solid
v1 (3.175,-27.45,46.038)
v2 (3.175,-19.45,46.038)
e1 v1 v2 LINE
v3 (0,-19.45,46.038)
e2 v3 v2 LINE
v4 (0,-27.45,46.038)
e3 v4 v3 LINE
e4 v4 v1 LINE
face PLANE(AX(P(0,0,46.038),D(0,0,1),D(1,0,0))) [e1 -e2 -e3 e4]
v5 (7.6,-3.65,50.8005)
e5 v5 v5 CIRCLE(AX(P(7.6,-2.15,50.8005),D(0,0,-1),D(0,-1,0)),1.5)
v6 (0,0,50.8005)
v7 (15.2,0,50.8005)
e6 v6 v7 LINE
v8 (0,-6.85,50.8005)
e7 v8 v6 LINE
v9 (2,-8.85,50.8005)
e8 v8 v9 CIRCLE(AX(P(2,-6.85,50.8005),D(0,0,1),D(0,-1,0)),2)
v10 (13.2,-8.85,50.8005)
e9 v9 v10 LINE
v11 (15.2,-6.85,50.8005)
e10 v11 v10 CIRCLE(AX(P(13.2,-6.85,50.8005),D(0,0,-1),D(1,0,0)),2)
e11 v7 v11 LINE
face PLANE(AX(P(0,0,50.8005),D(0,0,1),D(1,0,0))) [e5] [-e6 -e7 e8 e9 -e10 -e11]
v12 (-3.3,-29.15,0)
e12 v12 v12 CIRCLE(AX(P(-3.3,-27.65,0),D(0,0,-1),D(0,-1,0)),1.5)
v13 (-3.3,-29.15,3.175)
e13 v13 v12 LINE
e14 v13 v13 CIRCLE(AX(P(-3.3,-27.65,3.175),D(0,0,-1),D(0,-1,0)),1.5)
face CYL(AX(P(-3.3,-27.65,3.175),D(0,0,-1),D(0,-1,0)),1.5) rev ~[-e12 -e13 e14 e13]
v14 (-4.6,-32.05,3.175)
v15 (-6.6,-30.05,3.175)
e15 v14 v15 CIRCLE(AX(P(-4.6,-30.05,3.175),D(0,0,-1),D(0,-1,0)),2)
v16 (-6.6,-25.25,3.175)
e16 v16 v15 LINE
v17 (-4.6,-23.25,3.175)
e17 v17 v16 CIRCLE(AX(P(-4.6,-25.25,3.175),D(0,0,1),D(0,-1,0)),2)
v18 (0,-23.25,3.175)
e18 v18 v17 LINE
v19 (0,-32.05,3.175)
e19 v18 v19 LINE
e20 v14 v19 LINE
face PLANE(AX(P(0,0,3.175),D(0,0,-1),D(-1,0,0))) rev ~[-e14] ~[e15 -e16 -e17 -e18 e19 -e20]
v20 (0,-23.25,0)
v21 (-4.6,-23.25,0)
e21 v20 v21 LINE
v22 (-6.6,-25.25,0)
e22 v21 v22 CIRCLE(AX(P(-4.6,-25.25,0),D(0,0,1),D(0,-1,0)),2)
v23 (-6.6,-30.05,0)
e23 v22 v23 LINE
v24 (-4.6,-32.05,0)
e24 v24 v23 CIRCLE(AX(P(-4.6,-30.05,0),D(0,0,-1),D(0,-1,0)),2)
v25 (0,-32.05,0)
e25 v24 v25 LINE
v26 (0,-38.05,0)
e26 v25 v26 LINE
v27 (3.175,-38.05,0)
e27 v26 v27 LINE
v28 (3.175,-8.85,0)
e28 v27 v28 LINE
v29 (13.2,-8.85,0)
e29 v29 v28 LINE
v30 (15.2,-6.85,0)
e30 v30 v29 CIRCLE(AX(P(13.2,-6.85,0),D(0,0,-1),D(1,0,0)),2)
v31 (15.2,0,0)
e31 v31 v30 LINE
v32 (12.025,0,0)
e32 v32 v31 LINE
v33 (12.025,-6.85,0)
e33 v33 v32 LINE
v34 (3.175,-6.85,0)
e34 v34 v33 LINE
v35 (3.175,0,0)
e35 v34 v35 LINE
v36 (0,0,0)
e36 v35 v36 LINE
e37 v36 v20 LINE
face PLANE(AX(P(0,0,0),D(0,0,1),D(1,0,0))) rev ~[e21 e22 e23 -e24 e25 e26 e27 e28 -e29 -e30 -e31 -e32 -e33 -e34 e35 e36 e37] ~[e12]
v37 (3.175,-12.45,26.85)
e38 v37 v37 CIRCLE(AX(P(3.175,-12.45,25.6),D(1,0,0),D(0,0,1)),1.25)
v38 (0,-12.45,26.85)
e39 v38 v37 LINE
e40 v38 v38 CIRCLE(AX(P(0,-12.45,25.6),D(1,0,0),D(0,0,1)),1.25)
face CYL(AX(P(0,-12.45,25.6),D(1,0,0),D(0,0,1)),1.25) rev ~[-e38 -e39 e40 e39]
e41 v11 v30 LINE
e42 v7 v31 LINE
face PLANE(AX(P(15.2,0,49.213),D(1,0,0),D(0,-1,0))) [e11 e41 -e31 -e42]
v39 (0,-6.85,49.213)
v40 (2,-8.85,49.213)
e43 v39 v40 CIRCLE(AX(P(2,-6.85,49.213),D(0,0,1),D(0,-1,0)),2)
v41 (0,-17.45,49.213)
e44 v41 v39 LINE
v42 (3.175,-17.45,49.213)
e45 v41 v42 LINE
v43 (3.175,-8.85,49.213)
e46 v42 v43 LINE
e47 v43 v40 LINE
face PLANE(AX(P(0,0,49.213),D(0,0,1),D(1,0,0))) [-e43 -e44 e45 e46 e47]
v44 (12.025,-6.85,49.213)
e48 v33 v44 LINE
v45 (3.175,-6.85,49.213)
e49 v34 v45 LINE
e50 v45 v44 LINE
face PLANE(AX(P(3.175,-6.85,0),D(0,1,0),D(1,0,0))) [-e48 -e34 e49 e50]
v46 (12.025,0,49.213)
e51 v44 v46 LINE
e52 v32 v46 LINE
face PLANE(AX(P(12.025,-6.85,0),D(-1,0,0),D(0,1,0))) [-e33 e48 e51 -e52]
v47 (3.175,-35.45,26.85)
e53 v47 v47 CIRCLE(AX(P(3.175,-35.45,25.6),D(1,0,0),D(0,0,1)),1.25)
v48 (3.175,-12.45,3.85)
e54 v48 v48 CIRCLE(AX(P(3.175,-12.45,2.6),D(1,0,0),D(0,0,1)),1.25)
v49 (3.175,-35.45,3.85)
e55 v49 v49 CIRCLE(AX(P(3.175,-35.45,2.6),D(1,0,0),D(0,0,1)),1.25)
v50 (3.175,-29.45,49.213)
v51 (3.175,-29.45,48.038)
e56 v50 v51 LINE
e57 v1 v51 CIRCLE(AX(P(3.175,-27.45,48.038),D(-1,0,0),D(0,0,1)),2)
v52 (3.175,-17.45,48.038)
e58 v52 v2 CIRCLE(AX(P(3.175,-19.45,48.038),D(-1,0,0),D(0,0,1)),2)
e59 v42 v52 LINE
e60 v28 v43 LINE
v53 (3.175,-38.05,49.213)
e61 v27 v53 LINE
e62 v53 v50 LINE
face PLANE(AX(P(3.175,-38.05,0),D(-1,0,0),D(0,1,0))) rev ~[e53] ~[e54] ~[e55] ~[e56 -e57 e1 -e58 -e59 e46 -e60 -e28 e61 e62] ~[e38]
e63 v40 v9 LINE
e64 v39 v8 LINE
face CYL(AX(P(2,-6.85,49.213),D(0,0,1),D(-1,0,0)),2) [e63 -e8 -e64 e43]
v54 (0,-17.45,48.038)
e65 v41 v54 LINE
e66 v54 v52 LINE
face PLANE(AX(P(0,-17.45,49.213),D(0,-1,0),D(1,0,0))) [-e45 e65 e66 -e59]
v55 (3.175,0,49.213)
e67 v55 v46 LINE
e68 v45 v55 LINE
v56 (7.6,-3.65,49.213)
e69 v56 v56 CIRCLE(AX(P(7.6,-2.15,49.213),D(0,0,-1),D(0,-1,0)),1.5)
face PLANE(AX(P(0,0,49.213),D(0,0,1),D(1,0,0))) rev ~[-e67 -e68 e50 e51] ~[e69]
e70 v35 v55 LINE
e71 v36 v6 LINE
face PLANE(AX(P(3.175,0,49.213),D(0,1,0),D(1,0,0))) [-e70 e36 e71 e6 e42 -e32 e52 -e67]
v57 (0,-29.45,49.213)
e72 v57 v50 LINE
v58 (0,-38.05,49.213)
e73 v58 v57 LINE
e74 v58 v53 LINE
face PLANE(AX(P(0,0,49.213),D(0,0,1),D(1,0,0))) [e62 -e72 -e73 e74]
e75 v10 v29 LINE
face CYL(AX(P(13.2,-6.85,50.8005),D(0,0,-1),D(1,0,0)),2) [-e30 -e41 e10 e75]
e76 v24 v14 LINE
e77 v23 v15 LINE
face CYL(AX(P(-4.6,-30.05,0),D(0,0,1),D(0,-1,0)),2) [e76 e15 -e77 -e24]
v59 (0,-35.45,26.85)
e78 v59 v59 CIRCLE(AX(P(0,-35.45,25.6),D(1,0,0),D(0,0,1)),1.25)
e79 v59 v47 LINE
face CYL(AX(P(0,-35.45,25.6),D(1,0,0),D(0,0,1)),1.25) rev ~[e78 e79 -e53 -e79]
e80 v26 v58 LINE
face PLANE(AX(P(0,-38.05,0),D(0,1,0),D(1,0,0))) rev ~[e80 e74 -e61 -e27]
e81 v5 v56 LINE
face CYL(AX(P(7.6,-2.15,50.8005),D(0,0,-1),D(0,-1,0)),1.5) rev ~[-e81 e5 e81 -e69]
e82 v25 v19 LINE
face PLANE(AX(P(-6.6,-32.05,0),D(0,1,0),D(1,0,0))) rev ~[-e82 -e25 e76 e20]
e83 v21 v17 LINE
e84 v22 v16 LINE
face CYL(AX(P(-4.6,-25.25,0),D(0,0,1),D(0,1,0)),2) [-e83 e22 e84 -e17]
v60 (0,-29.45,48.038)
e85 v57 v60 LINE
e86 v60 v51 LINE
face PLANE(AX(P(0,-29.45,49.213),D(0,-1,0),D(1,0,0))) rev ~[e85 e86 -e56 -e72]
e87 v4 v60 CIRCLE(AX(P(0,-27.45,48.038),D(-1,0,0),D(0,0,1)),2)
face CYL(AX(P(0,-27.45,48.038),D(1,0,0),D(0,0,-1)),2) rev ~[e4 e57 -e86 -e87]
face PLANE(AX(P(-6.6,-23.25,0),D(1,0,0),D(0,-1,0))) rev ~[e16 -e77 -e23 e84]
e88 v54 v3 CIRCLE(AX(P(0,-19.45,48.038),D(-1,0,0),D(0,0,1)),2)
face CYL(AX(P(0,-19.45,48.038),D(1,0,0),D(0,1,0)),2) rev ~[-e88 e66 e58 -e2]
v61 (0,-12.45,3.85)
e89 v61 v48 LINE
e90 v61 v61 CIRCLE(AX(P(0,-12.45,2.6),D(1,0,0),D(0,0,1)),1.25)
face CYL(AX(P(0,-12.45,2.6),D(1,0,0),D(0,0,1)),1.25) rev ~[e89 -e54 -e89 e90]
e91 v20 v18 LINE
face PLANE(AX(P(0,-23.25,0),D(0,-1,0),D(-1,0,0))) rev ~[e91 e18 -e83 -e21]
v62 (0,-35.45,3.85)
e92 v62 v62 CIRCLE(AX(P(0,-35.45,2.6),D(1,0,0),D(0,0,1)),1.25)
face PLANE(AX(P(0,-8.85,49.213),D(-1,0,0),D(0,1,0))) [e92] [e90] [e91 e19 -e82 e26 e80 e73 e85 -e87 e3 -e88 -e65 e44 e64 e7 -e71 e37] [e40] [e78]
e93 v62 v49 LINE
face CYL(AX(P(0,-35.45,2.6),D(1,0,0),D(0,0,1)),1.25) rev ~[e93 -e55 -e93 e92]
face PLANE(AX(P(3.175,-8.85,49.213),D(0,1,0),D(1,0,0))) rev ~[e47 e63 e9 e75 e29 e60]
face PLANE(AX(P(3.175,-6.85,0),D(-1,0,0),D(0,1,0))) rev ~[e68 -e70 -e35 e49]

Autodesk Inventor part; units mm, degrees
ref_plane "YZ Plane" through (0, 0, 0) normal (1, 0, 0) x (0, 1, 0)
ref_plane "XZ Plane" through (0, 0, 0) normal (0, 1, 0) x (-1, 0, 0)
ref_plane "XY Plane" through (0, 0, 0) normal (0, 0, 1) x (1, 0, 0)
sketch "Sketch1" plane through (0, 0, 0) normal (0, 0, 1) x (1, 0, 0)
  line L0 (0, 0) -> (0, -38.05)
  line L1 (0, -38.05) -> (3.175, -38.05)
  line L2 (3.175, -38.05) -> (3.175, 0)
  line L3 (3.175, 0) -> (0, 0)
  line L4 (3.175, 0) -> (3.175, -6.85)
  line L5 (3.175, -6.85) -> (12.025, -6.85)
  line L6 (12.025, -6.85) -> (12.025, 0)
  line L7 (12.025, 0) -> (15.2, 0)
  line L8 (15.2, 0) -> (15.2, -6.85)
  line L9 (15.2, -6.85) -> (15.2, -8.85)
  line L10 (15.2, -8.85) -> (3.175, -8.85)
  line L11 (0, -38.05) -> (0, -31.2)
  dimension "d0" = 38.05
  dimension "d1" = 3.175
  dimension "d2" = 6.85
  dimension "d3" = 8.85
  dimension "d4" = 3.175
  dimension "d5" = 2
extrude "Extrusion1" add sketch "Sketch1" along normal blind 49.213
sketch "Sketch2" plane through (0, 0, 0) normal (0, 0, -1) x (-1, 0, 0)
  line L0 (0, -38.05) -> (-3.175, -38.05) projected
  line L1 (0, -38.05) -> (0, -32.05)
  line L2 (0, 0) -> (0, -38.05) projected
  line L3 (0, -32.05) -> (0, -23.25)
  line L4 (0, -23.25) -> (6.6, -23.25)
  line L5 (6.6, -23.25) -> (6.6, -32.05)
  line L6 (6.6, -32.05) -> (0, -32.05)
  dimension "d12" = 6
  dimension "d13" = 8.8
  dimension "d14" = 6.6
extrude "Extrusion2" add sketch "Sketch2" against normal blind 3.175
sketch "Sketch3" plane through (0, 0, 3.175) normal (0, 0, 1) x (1, 0, 0)
  line L0 (0, -23.25) -> (0, -32.05) projected
  line L1 (0, -23.25) -> (-3.3, -23.25)
  line L2 (0, -23.25) -> (-6.6, -23.25) projected
  line L3 (-3.3, -23.25) -> (-3.3, -27.65)
  point P0 (0, 0)
  dimension "d17" = 4.4
hole "Hole1" at (-3.3, -27.65, 3.175) direction (0, 0, -1) diameter 3 end through all
fillet "Fillet1" radius 2 2 edges at (-6.6, -23.25, 1.5875) (-6.6, -32.05, 1.5875)
sketch "Sketch4" plane through (0, 0, 49.213) normal (0, 0, 1) x (1, 0, 0)
  line L0 (3.175, 0) -> (0, 0) projected
  line L1 (3.175, -8.85) -> (15.2, -8.85) projected
  line L2 (0, 0) -> (15.2, 0)
  line L3 (15.2, 0) -> (15.2, -8.85)
  line L4 (15.2, -8.85) -> (0, -8.85)
  line L5 (0, -8.85) -> (0, 0)
extrude "Extrusion3" add sketch "Sketch4" along normal blind 1.5875
sketch "Sketch5" plane through (0, 0, 50.8005) normal (0, 0, 1) x (1, 0, 0)
  line L0 (3.175, 0) -> (0, 0) projected
  line L1 (0, 0) -> (3.175, 0)
  line L2 (3.175, 0) -> (12.025, 0) projected
  line L3 (3.175, 0) -> (7.6, 0)
  line L4 (7.6, 0) -> (7.6, -3.425)
  dimension "d28" = 3.425
hole "Hole2" at (7.6, -3.425, 50.8005) direction (0, 0, -1) diameter 3 end through all
fillet "Fillet2" radius 2 2 edges at (0, -8.85, 50.0068) (15.2, -8.85, 25.4003)
sketch "Sketch6" plane through (0, -38.05, 0) normal (-1, 0, 0) x (0, 0, 1)
  line L0 (0, 0) -> (0, 29.2) projected
  line L1 (0, 0) -> (0, 28.2)
  line L2 (0, 28.2) -> (28.2, 28.2)
  line L3 (28.2, 28.2) -> (28.2, 0)
  line L4 (0, 0) -> (49.213, 0) projected
  line L5 (0, 0) -> (0, 14.1)
  line L6 (0, 12.8) -> (0, 14.8) projected
  line L7 (0, 14.1) -> (14.1, 14.1)
  line L8 (14.1, 14.1) -> (2.6, 14.1)
  line L9 (2.6, 14.1) -> (2.6, 2.6)
  line L10 (0, 12.8) -> (3.175, 12.8) projected
  line L11 (2.6, 2.6) -> (25.6, 2.6)
  line L12 (25.6, 2.6) -> (25.6, 25.6)
  line L13 (25.6, 25.6) -> (2.6, 25.6)
  line L14 (2.6, 25.6) -> (2.6, 2.6)
  point P0 (0, 38.05)
  dimension "d37" = 28.2
  dimension "d38" = 28.2
  dimension "d39" = 11.5
  dimension "d40" = 11.5
  dimension "d41" = 90
  dimension "d42" = 23
  dimension "d43" = 23
hole "Hole3" at (0, -35.45, 2.6) at (0, -35.45, 25.6) at (0, -12.45, 25.6) at (0, -12.45, 2.6) direction (1, 0, 0) diameter 2.5 end through all
delete faces "Delete1" heal yes whole lump no faces at (7.7207, -4.9201, 50.2713)
sketch "Sketch7" plane through (0, 0, 50.8005) normal (0, 0, 1) x (1, 0, 0)
  line L0 (15.2, -6.85) -> (15.2, 0) projected
  line L1 (15.2, 0) -> (0, 0) projected
  line L2 (15.2, 0) -> (0, 0)
  line L3 (0, 0) -> (7.6, 0)
  line L4 (7.6, 0) -> (7.6, -2.15)
  dimension "d51" = 2.15
hole "Hole4" at (7.6, -2.15, 50.8005) direction (0, 0, -1) diameter 3 depth 3.5
sketch "Sketch8" plane through (0, 0, 49.213) normal (0, 0, 1) x (1, 0, 0)
  line L0 (0, -38.05) -> (3.175, -38.05) projected
  line L1 (3.175, -38.05) -> (0, -38.05)
  line L2 (3.175, -23.45) -> (0, -23.45)
  line L3 (0, -23.45) -> (0, -17.45)
  line L4 (0, -17.45) -> (3.175, -17.45)
  line L5 (3.175, -17.45) -> (3.175, -23.45)
  line L6 (3.175, -23.45) -> (0, -23.45)
  line L7 (0, -23.45) -> (0, -29.45)
  line L8 (0, -29.45) -> (3.175, -29.45)
  line L9 (3.175, -29.45) -> (3.175, -23.45)
  point P0 (0, 0)
  point P1 (3.175, -8.85)
  dimension "d59" = 6
  dimension "d60" = 6
extrude "Extrusion4" cut sketch "Sketch8" against normal blind 3.175
fillet "Fillet3" radius 2 2 edges at (1.5875, -17.45, 46.038) (1.5875, -29.45, 46.038)
properties part number "Yaw Motor Mount"
